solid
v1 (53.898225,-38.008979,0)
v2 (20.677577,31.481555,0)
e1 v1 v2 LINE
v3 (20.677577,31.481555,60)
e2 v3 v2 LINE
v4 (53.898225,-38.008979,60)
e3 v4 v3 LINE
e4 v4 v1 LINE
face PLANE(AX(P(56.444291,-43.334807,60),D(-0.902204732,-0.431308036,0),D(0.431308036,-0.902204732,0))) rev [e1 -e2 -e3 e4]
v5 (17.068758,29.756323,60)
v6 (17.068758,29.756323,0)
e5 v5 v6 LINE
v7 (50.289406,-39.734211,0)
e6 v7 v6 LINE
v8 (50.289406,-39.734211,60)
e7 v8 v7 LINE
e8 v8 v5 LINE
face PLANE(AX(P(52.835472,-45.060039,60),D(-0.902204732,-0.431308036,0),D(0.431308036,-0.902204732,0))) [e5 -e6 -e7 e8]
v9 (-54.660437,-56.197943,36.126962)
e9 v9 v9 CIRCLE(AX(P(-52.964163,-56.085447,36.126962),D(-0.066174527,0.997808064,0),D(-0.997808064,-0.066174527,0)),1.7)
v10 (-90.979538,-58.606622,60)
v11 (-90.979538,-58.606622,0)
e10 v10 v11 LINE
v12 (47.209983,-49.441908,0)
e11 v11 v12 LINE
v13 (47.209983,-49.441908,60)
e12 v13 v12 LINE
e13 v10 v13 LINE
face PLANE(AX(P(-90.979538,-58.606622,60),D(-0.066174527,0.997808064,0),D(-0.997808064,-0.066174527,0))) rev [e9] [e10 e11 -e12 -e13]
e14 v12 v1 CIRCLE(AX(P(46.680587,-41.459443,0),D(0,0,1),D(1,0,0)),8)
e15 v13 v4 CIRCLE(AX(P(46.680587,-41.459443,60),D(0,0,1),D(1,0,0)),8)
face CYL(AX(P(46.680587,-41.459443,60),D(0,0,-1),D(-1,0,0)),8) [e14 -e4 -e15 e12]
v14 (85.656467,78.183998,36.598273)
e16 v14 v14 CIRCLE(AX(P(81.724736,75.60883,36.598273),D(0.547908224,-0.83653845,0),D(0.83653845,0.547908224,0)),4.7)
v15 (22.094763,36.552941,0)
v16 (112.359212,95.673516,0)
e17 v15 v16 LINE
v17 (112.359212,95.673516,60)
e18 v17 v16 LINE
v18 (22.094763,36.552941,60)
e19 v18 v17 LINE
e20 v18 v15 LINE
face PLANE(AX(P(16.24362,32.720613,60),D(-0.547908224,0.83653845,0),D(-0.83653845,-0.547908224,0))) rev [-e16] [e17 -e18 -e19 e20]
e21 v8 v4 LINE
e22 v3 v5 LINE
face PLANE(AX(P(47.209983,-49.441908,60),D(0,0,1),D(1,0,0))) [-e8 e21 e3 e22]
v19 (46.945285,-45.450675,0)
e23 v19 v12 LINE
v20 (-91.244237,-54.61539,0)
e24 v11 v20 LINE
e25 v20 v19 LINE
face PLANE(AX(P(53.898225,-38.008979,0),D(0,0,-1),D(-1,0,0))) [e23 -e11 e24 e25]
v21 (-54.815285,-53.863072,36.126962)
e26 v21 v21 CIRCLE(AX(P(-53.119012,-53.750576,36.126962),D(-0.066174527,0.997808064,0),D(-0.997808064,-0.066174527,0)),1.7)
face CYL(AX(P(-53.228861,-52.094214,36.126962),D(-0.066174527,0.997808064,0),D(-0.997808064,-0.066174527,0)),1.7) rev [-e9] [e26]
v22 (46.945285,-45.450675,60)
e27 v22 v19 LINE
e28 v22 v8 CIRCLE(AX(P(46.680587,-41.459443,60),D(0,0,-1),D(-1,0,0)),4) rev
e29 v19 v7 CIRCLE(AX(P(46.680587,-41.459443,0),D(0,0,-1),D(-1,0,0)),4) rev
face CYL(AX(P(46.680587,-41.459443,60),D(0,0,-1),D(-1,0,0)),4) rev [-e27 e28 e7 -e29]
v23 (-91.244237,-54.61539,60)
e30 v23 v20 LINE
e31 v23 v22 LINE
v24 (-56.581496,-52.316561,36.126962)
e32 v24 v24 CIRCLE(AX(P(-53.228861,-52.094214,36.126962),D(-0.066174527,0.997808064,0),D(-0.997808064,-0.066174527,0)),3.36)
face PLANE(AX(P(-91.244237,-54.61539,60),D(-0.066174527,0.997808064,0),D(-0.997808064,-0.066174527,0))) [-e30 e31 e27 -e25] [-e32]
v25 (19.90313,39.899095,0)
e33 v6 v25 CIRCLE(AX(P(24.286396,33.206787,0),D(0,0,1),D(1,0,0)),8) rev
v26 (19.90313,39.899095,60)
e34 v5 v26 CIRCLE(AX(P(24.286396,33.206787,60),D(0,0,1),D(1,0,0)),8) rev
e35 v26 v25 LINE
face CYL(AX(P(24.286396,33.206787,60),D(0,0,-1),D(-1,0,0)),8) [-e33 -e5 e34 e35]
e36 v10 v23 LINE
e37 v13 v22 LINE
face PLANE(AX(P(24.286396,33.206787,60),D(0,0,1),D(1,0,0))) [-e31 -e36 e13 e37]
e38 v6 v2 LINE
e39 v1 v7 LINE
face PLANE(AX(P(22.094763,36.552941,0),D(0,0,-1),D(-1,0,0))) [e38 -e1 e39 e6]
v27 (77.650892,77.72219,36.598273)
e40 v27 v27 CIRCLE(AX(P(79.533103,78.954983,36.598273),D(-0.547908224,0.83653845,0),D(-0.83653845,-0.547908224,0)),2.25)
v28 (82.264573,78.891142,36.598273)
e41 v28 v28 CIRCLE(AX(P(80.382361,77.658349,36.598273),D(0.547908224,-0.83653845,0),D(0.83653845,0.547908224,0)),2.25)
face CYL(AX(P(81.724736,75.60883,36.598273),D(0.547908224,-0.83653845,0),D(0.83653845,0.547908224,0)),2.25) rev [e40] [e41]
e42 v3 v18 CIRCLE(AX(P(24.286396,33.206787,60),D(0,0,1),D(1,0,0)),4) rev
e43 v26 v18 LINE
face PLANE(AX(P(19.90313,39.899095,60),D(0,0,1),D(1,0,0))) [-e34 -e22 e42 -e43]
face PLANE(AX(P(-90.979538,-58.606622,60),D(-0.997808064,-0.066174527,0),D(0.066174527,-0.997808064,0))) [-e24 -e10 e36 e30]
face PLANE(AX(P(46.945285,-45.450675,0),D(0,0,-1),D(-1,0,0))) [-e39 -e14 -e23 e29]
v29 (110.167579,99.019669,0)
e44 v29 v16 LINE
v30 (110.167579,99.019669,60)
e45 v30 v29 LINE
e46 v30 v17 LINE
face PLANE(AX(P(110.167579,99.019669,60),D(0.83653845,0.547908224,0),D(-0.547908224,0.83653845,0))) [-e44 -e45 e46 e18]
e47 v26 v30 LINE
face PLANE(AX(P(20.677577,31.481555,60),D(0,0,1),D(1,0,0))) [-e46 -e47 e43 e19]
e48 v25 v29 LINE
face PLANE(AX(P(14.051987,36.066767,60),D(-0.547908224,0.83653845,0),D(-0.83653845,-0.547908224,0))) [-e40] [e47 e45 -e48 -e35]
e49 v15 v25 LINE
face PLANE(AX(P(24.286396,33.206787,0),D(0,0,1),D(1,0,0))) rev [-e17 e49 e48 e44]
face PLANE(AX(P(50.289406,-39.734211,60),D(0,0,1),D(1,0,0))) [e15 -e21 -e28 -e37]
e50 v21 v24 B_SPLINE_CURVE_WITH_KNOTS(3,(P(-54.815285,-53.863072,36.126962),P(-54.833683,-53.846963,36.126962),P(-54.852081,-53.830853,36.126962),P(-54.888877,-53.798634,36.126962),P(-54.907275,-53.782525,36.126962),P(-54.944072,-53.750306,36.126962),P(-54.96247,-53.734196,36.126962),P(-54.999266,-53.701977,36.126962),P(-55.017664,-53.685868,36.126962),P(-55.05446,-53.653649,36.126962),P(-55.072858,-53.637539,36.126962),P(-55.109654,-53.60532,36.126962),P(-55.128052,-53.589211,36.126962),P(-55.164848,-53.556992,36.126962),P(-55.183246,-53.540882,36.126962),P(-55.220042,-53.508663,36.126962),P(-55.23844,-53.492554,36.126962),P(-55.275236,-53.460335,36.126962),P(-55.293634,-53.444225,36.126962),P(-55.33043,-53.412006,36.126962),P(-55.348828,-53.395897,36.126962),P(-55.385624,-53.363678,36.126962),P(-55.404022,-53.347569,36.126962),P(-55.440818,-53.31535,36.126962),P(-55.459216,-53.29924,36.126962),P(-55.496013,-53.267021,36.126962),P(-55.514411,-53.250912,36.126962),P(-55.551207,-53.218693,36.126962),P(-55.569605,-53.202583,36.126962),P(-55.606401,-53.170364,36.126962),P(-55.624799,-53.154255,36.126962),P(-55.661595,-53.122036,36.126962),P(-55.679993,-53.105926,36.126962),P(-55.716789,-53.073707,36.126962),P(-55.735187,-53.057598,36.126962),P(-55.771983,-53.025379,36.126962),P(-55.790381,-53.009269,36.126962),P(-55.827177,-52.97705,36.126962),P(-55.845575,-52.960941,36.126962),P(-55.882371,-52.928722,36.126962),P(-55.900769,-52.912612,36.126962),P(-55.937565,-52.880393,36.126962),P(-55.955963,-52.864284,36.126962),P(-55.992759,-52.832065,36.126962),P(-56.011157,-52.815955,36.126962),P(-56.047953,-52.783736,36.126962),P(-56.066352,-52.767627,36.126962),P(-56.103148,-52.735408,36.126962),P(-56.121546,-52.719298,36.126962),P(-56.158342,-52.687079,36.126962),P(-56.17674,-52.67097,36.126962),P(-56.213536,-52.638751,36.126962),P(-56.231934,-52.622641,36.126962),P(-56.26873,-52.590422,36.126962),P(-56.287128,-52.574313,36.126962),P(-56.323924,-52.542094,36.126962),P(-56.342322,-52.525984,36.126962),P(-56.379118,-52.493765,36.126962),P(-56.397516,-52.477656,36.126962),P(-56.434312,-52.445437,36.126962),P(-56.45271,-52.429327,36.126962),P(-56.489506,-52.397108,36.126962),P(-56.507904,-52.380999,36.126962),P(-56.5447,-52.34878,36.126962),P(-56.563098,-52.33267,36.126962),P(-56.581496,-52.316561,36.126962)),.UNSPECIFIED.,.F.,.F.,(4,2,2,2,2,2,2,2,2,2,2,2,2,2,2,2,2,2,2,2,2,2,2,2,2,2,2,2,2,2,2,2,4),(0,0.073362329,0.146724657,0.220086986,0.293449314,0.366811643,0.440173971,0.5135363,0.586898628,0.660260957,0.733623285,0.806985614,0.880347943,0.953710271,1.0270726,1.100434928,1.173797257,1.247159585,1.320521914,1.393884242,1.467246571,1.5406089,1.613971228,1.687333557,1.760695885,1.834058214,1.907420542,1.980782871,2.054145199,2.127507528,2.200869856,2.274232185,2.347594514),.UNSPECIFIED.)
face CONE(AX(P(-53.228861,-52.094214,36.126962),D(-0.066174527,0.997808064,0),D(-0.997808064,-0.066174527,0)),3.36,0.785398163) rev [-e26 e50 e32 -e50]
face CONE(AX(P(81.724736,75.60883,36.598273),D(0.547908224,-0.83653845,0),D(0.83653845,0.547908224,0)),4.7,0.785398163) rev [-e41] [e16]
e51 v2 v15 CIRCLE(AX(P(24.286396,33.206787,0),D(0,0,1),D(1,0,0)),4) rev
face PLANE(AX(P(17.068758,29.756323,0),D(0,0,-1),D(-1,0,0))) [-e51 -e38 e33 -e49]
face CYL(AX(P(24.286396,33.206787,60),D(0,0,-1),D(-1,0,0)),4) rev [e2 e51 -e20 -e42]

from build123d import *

# Parameters (mm, degrees)
BASE_FLANGE1_DEPTH                                   = 60
CSK_FOR_M3_HEX_SOCKET_COUNTERSUNK_CAP_SC_D           = 3.4
CSK_FOR_M3_HEX_SOCKET_COUNTERSUNK_CAP_SC_CSINK_D     = 6.72
CSK_FOR_M3_HEX_SOCKET_COUNTERSUNK_CAP_SC_CSINK_ANGLE = 90
CSK_FOR_M4_COUNTERSUNK_RAISED_HEAD_SCREW_D           = 4.5
CSK_FOR_M4_COUNTERSUNK_RAISED_HEAD_SCREW_CSINK_D     = 9.4
CSK_FOR_M4_COUNTERSUNK_RAISED_HEAD_SCREW_CSINK_ANGLE = 90


# Sheet-metal steps are written as plain solids
with BuildPart() as part:
    # Sketch1 → Base-Flange1 (new body)
    with BuildSketch(Plane.XY):
        with BuildLine():
            Line((-91.244236532, -54.615390039), (46.945285338, -45.450675325))
            ThreePointArc((46.945285338, -45.450675325), (50.13319854, -43.479214131), (50.289406158, -39.734210927))
            Line((50.289406158, -39.734210927), (17.068758356, 29.75632288))
            ThreePointArc((17.068758356, 29.75632288), (16.581579748, 35.359878725), (19.903130417, 39.899094764))
            Line((19.903130417, 39.899094764), (110.167579221, 99.019669419))
            Line((110.167579221, 99.019669419), (112.359212119, 95.673515621))
            Line((112.359212119, 95.673515621), (22.094763314, 36.552940965))
            ThreePointArc((22.094763314, 36.552940965), (20.43398798, 34.283332946), (20.677577284, 31.481555023))
            Line((20.677577284, 31.481555023), (53.898225085, -38.008978784))
            ThreePointArc((53.898225085, -38.008978784), (53.585809851, -45.498985193), (47.209983446, -49.44190758))
            Line((47.209983446, -49.44190758), (-90.979538424, -58.606622294))
            Line((-90.979538424, -58.606622294), (-91.244236532, -54.615390039))
        make_face()
    extrude(amount=BASE_FLANGE1_DEPTH)

    # CSK for M3 Hex Socket Countersunk Cap Screw1 (through all)
    with Locations(Plane(origin=(3.206660902, -48.351416347, 0), x_dir=(0.9978080636970287, 0.06617452698120734, 0), z_dir=(-0.06617452698120732, 0.9978080636970286, 0))):
        with Locations((-56.559497038, -36.126961684)):
            CounterSinkHole(CSK_FOR_M3_HEX_SOCKET_COUNTERSUNK_CAP_SC_D / 2, CSK_FOR_M3_HEX_SOCKET_COUNTERSUNK_CAP_SC_CSINK_D / 2, counter_sink_angle=CSK_FOR_M3_HEX_SOCKET_COUNTERSUNK_CAP_SC_CSINK_ANGLE)

    # CSK for M4 Countersunk Raised Head Screw1 (through all)
    with Locations(Plane(origin=(-10.120981557, 15.452570055, 0), x_dir=(-0.836538449635925, -0.5479082243229453, 0), z_dir=(0.5479082243229453, -0.836538449635925, 0))):
        with Locations((-109.792583779, -36.598273193)):
            CounterSinkHole(CSK_FOR_M4_COUNTERSUNK_RAISED_HEAD_SCREW_D / 2, CSK_FOR_M4_COUNTERSUNK_RAISED_HEAD_SCREW_CSINK_D / 2, counter_sink_angle=CSK_FOR_M4_COUNTERSUNK_RAISED_HEAD_SCREW_CSINK_ANGLE)


solid = part.part
